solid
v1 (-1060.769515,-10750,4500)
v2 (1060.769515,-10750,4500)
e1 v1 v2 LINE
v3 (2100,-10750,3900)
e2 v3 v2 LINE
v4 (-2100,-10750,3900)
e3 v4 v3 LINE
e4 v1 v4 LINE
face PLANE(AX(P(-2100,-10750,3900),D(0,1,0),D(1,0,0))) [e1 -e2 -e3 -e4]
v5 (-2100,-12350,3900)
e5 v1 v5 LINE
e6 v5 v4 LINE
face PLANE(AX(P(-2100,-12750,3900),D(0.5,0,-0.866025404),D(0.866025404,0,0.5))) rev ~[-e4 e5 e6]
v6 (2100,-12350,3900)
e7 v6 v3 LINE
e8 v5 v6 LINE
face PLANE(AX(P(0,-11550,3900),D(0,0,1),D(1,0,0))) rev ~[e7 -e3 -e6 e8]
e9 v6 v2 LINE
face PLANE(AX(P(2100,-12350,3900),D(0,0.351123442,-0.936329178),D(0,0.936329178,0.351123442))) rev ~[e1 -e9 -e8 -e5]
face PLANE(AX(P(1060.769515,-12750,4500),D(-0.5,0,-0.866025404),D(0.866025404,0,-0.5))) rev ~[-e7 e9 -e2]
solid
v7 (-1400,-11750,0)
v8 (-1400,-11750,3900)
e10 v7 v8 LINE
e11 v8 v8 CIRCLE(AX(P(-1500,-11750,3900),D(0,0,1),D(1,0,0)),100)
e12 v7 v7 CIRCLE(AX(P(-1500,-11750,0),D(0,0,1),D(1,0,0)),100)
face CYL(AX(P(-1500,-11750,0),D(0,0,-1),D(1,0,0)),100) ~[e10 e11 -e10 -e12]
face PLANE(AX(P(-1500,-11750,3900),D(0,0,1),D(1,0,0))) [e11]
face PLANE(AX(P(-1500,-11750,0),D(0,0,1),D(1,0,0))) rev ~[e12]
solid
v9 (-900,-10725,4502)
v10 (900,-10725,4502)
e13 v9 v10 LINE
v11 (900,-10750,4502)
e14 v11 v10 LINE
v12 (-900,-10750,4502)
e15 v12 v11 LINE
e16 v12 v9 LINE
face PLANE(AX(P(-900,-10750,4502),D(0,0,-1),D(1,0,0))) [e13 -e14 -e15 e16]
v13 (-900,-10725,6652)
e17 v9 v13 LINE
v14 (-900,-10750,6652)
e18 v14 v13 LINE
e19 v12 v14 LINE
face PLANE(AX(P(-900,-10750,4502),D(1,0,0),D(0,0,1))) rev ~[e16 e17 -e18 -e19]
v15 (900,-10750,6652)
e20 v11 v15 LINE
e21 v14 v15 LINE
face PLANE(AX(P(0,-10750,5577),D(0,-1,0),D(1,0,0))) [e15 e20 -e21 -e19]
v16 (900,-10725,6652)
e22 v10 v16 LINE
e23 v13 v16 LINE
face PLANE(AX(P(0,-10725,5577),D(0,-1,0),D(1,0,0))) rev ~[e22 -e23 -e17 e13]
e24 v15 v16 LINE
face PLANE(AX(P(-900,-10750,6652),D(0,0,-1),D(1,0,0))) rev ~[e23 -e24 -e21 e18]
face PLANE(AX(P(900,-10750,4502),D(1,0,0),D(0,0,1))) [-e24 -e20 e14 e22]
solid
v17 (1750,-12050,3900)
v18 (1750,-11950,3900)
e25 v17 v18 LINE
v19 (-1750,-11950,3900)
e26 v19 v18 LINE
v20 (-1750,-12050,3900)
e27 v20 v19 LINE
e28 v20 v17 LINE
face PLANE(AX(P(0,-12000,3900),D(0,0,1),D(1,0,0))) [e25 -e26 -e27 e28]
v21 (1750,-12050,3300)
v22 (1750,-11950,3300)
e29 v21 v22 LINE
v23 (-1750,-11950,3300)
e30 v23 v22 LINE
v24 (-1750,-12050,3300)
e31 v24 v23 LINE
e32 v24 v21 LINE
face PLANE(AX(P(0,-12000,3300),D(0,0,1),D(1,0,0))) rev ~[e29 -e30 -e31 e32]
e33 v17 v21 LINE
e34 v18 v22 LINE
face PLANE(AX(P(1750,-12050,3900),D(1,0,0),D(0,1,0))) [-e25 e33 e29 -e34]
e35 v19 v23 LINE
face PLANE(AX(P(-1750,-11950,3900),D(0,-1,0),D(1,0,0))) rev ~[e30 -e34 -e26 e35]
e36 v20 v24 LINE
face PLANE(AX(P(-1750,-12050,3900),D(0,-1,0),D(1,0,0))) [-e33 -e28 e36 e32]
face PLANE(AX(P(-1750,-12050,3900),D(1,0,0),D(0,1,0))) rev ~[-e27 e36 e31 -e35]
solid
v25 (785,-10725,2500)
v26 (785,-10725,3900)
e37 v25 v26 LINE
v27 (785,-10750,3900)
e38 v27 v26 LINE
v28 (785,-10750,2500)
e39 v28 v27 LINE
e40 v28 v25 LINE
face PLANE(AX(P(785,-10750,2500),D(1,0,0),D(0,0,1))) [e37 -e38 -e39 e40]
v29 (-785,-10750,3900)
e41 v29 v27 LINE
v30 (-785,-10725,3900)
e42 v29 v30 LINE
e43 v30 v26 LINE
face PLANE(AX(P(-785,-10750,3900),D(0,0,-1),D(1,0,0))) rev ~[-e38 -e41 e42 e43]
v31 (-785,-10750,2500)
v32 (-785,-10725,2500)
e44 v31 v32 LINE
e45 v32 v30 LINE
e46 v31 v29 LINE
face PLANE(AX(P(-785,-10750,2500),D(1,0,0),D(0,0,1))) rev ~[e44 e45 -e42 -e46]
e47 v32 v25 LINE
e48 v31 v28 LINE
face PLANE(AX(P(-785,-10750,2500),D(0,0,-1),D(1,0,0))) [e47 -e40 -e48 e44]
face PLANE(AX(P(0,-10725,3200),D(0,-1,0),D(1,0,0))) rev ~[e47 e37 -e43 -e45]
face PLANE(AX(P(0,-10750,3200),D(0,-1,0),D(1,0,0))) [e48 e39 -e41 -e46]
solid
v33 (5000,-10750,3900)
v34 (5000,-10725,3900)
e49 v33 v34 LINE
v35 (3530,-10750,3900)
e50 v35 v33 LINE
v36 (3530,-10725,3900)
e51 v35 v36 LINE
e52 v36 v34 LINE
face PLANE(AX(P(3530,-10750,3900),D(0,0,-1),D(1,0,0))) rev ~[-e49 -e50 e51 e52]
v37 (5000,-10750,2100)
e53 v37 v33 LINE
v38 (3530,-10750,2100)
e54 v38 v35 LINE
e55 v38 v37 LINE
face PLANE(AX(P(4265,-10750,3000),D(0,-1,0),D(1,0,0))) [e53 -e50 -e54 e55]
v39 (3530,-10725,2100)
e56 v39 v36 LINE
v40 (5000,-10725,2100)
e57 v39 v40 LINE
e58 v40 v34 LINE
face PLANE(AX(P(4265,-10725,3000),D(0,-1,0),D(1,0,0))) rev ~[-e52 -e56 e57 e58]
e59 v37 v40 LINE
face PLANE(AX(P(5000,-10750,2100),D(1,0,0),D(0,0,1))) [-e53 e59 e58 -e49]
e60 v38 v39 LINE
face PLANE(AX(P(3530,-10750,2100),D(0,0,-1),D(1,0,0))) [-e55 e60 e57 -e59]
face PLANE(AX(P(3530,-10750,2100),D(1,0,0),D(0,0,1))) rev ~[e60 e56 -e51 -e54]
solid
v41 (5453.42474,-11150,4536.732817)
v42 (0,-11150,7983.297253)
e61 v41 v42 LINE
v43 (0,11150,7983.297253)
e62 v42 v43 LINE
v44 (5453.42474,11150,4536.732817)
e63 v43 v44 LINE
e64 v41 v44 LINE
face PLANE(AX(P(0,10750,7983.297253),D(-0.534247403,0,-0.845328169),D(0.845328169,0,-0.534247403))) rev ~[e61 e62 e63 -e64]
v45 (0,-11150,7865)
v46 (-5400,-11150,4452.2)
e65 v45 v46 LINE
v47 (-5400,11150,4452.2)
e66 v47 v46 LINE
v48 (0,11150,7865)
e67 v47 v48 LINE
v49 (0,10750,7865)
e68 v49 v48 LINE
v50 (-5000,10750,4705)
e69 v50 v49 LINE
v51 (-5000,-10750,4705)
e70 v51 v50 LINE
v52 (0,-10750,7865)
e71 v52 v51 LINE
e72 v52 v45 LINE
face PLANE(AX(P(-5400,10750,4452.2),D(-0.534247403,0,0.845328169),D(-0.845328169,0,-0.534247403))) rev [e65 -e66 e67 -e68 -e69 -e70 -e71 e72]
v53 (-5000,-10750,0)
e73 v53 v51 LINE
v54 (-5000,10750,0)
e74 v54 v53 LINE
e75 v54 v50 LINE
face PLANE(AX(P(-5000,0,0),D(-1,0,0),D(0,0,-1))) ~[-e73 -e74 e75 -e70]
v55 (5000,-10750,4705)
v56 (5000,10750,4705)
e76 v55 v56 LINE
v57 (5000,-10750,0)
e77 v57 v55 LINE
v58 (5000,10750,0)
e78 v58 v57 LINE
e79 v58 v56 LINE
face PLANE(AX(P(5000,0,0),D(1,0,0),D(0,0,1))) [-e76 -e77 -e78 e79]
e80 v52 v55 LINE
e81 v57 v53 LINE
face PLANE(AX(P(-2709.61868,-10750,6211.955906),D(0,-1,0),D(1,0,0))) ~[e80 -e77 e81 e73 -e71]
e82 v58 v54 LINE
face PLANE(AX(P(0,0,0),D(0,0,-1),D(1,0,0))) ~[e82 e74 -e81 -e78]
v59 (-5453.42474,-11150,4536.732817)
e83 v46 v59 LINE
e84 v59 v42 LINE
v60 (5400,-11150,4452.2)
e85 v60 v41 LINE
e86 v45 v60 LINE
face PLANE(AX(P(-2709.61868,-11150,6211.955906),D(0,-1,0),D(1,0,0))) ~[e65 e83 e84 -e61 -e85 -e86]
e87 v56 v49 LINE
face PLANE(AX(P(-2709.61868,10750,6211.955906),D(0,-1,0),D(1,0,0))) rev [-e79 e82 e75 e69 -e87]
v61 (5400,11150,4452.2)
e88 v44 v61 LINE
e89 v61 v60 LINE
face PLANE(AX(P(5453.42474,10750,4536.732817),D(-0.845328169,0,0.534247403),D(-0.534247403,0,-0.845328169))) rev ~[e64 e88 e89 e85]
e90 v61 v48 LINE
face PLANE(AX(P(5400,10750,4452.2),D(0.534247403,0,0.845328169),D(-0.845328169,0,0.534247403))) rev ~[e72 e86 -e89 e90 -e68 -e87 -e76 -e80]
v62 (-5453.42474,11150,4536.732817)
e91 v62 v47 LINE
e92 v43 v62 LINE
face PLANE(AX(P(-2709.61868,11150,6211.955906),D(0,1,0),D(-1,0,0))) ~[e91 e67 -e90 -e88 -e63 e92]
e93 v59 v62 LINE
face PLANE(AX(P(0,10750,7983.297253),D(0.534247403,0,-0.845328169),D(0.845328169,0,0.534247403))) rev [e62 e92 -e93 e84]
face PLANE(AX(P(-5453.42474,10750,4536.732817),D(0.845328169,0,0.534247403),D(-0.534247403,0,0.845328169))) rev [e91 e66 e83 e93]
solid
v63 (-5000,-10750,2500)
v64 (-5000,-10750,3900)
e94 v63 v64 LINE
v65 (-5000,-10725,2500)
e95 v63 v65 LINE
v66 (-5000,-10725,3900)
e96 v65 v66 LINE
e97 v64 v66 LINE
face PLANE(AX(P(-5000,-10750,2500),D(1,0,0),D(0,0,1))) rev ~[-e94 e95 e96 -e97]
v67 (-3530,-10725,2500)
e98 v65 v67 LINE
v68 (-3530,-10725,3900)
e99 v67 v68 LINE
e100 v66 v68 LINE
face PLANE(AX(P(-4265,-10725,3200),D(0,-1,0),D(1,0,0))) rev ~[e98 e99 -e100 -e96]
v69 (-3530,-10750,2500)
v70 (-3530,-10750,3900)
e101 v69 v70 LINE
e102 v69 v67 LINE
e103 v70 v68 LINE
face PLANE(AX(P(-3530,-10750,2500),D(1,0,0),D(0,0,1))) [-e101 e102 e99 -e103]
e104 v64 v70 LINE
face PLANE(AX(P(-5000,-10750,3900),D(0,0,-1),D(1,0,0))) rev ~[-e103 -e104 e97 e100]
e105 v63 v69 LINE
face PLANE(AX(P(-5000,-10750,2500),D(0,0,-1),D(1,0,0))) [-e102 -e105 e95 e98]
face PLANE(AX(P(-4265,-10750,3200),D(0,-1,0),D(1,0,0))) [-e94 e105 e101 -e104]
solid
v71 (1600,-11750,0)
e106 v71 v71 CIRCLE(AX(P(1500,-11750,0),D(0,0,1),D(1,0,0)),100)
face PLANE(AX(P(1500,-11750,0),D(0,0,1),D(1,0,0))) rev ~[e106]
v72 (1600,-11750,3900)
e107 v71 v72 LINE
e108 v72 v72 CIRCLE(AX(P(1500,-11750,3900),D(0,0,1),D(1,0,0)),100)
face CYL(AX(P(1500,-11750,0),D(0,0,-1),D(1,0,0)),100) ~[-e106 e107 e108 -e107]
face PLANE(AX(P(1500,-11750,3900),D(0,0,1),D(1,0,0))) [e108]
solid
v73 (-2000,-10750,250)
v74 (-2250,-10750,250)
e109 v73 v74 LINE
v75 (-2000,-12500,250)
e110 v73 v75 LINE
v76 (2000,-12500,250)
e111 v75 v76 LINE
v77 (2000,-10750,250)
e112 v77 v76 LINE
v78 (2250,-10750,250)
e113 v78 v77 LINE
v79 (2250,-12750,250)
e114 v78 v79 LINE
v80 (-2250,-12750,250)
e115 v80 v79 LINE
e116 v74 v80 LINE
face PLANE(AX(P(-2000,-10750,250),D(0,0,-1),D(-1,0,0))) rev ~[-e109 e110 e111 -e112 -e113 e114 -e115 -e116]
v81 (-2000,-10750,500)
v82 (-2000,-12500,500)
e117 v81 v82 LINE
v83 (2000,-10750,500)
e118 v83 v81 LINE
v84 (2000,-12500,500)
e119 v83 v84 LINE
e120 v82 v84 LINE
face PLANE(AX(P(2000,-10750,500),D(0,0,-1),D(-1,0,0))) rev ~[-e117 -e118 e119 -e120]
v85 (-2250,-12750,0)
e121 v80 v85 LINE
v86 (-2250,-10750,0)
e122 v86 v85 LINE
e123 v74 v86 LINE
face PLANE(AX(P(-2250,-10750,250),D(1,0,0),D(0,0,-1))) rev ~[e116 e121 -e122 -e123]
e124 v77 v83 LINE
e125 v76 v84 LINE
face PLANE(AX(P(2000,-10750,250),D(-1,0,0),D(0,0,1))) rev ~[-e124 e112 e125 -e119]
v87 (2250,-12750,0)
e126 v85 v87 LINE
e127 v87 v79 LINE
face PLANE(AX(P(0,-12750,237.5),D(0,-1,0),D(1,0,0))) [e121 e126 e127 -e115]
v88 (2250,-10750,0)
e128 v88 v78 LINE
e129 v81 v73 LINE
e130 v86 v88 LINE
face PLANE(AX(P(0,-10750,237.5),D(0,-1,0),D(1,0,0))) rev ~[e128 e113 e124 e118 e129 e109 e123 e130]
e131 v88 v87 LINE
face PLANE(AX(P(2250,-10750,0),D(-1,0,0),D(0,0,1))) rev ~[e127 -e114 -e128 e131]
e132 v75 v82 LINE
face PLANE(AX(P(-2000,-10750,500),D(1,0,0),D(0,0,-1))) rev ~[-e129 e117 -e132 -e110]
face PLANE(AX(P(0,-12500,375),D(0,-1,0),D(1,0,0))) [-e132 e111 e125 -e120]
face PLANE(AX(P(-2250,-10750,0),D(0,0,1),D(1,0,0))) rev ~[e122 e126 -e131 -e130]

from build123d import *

# Parameters (mm, degrees)
F1_DEPTH  = 10750
F3_DEPTH  = 21500
F5_DEPTH  = 400
F7_DEPTH  = 400
F9_W      = 1800
F9_H      = 2150
F10_DEPTH = 25
F9_W_2    = 1570
F9_H_2    = 1400
F9_W_3    = 1470
F9_H_3    = 1800
F11_R     = 100
F12_DEPTH = 3900
F13_W     = 4200
F13_H     = 1600
F13_R     = 100
F14_DEPTH = 600
F16_DEPTH = 7553.4257402618
F19_DEPTH = 23900.001
F21_DEPTH = 2000
F22_W     = 4000
F22_H     = 250
F23_DEPTH = 250
F24_W     = 3500
F24_H     = 100
F25_DEPTH = 600


with BuildPart() as f1:
    # F0 (on Front) → F1 (new body, symmetric)
    with BuildSketch(Plane.XZ):
        Polygon((0, 7865), (0, 0), (5000, 0), (5000, 4705), align=None)
    extrude(amount=F1_DEPTH, both=True)

    # F2 (on face) → F3 (join)
    with BuildSketch(Plane.XZ.offset(10750)):
        Polygon((5400, 4452.2), (5453.4247402618, 4536.7328168699), (0, 7983.2972527154), (0, 7865), align=None)
    extrude(amount=-F3_DEPTH)

    # F4 (on face) → F5 (join)
    with BuildSketch(Plane.XZ.offset(10750)):
        Polygon((5453.4247402618, 4536.7328168699), (0, 7983.2972527154), (0, 7865), (5000, 4705), (5400, 4452.2), align=None)
    extrude(amount=F5_DEPTH)

    # F6 (on face) → F7 (join)
    with BuildSketch(Plane(origin=(0, 10750, 0), x_dir=(-1, 0, 0), z_dir=(0, 1, 0))):
        Polygon((0, 7865), (0, 7983.2972527154), (-5453.4247402618, 4536.7328168699), (-5400, 4452.2), (-5000, 4705), align=None)
    extrude(amount=F7_DEPTH)

    # F8: F1 across face


with BuildPart() as f1_1:
    add(f1.part)
    add(f1.part.mirror(Plane(origin=(0, 0, 3993.815697783), x_dir=(0, -1, 0), z_dir=(-1, 0, 0))))


with BuildPart() as f10:
    # F9 (on face) → F10 (new body)
    with BuildSketch(Plane.XZ.offset(10750)):
        with Locations((0, 5577)):
            Rectangle(F9_W, F9_H)
    extrude(amount=-F10_DEPTH)


with BuildPart() as f10b:
    # F9 (on face) → F10, piece 2 (new body)
    with BuildSketch(Plane.XZ.offset(10750)):
        with Locations((0, 3200)):
            Rectangle(F9_W_2, F9_H_2)
    extrude(amount=-F10_DEPTH)


with BuildPart() as f10c:
    # F9 (on face) → F10, piece 3 (new body)
    with BuildSketch(Plane.XZ.offset(10750)):
        with Locations((-4265, 3200)):
            Rectangle(F9_W_3, F9_H_2)
    extrude(amount=-F10_DEPTH)


with BuildPart() as f10d:
    # F9 (on face) → F10, piece 4 (new body)
    with BuildSketch(Plane.XZ.offset(10750)):
        with Locations((4265, 3000)):
            Rectangle(F9_W_3, F9_H_3)
    extrude(amount=-F10_DEPTH)


with BuildPart() as f12:
    # F11 (on Top) → F12 (new body)
    with BuildSketch(Plane.XY):
        with Locations((-1500, -11750)):
            Circle(F11_R)
    extrude(amount=F12_DEPTH)


with BuildPart() as f12b:
    # F11 (on Top) → F12, piece 2 (new body)
    with BuildSketch(Plane.XY):
        with Locations((1500, -11750)):
            Circle(F11_R)
    extrude(amount=F12_DEPTH)


with BuildPart() as f14:
    # F13 (on face) → F14 (new body)
    with BuildSketch(Plane.XY.offset(3900)):
        with Locations((0, -11550)):
            Rectangle(F13_W, F13_H)
        with Locations((-1500, -11750)):
            Circle(F13_R, mode=Mode.SUBTRACT)
        with Locations((1500, -11750)):
            Circle(F13_R, mode=Mode.SUBTRACT)
        with Locations((1500, -11750)):
            Circle(F13_R)
        with Locations((-1500, -11750)):
            Circle(F13_R)
    extrude(amount=F14_DEPTH)

    # F15 (on face) → F16 (cut, through all)
    with BuildSketch(Plane.YZ.offset(2100)):
        Polygon((-12350, 4500), (-12350, 3900), (-10750, 4500), align=None)
    extrude(amount=-F16_DEPTH, mode=Mode.SUBTRACT)

    # F18 (on offset) → F19 (cut, through all)
    with BuildSketch(Plane.XZ.offset(12750)):
        Polygon((-2100, 3900), (-1060.7695154587, 4500), (-2100, 4500), align=None)
        Polygon((2100, 3900), (2100, 4500), (1060.7695154587, 4500), align=None)
    extrude(amount=-F19_DEPTH, mode=Mode.SUBTRACT)


with BuildPart() as f21:
    # F20 (on face) → F21 (new body)
    with BuildSketch(Plane.XZ.offset(10750)):
        Polygon((-2250, 250), (-2250, 0), (2250, 0), (2250, 250), (2000, 250), (2000, 500), (-2000, 500), (-2000, 250), align=None)
    extrude(amount=F21_DEPTH)

    # F22 (on face) → F23 (cut)
    with BuildSketch(Plane.XZ.offset(12750)):
        with Locations((0, 375)):
            Rectangle(F22_W, F22_H)
    extrude(amount=-F23_DEPTH, mode=Mode.SUBTRACT)


with BuildPart() as f25:
    # F24 (on face) → F25 (new body)
    with BuildSketch(Plane.XY.offset(3900)):
        with Locations((0, -12000)):
            Rectangle(F24_W, F24_H)
    extrude(amount=-F25_DEPTH)


solid = Compound([f1_1.part, f10.part, f10b.part, f10c.part, f10d.part, f12.part, f12b.part, f14.part, f21.part, f25.part])
